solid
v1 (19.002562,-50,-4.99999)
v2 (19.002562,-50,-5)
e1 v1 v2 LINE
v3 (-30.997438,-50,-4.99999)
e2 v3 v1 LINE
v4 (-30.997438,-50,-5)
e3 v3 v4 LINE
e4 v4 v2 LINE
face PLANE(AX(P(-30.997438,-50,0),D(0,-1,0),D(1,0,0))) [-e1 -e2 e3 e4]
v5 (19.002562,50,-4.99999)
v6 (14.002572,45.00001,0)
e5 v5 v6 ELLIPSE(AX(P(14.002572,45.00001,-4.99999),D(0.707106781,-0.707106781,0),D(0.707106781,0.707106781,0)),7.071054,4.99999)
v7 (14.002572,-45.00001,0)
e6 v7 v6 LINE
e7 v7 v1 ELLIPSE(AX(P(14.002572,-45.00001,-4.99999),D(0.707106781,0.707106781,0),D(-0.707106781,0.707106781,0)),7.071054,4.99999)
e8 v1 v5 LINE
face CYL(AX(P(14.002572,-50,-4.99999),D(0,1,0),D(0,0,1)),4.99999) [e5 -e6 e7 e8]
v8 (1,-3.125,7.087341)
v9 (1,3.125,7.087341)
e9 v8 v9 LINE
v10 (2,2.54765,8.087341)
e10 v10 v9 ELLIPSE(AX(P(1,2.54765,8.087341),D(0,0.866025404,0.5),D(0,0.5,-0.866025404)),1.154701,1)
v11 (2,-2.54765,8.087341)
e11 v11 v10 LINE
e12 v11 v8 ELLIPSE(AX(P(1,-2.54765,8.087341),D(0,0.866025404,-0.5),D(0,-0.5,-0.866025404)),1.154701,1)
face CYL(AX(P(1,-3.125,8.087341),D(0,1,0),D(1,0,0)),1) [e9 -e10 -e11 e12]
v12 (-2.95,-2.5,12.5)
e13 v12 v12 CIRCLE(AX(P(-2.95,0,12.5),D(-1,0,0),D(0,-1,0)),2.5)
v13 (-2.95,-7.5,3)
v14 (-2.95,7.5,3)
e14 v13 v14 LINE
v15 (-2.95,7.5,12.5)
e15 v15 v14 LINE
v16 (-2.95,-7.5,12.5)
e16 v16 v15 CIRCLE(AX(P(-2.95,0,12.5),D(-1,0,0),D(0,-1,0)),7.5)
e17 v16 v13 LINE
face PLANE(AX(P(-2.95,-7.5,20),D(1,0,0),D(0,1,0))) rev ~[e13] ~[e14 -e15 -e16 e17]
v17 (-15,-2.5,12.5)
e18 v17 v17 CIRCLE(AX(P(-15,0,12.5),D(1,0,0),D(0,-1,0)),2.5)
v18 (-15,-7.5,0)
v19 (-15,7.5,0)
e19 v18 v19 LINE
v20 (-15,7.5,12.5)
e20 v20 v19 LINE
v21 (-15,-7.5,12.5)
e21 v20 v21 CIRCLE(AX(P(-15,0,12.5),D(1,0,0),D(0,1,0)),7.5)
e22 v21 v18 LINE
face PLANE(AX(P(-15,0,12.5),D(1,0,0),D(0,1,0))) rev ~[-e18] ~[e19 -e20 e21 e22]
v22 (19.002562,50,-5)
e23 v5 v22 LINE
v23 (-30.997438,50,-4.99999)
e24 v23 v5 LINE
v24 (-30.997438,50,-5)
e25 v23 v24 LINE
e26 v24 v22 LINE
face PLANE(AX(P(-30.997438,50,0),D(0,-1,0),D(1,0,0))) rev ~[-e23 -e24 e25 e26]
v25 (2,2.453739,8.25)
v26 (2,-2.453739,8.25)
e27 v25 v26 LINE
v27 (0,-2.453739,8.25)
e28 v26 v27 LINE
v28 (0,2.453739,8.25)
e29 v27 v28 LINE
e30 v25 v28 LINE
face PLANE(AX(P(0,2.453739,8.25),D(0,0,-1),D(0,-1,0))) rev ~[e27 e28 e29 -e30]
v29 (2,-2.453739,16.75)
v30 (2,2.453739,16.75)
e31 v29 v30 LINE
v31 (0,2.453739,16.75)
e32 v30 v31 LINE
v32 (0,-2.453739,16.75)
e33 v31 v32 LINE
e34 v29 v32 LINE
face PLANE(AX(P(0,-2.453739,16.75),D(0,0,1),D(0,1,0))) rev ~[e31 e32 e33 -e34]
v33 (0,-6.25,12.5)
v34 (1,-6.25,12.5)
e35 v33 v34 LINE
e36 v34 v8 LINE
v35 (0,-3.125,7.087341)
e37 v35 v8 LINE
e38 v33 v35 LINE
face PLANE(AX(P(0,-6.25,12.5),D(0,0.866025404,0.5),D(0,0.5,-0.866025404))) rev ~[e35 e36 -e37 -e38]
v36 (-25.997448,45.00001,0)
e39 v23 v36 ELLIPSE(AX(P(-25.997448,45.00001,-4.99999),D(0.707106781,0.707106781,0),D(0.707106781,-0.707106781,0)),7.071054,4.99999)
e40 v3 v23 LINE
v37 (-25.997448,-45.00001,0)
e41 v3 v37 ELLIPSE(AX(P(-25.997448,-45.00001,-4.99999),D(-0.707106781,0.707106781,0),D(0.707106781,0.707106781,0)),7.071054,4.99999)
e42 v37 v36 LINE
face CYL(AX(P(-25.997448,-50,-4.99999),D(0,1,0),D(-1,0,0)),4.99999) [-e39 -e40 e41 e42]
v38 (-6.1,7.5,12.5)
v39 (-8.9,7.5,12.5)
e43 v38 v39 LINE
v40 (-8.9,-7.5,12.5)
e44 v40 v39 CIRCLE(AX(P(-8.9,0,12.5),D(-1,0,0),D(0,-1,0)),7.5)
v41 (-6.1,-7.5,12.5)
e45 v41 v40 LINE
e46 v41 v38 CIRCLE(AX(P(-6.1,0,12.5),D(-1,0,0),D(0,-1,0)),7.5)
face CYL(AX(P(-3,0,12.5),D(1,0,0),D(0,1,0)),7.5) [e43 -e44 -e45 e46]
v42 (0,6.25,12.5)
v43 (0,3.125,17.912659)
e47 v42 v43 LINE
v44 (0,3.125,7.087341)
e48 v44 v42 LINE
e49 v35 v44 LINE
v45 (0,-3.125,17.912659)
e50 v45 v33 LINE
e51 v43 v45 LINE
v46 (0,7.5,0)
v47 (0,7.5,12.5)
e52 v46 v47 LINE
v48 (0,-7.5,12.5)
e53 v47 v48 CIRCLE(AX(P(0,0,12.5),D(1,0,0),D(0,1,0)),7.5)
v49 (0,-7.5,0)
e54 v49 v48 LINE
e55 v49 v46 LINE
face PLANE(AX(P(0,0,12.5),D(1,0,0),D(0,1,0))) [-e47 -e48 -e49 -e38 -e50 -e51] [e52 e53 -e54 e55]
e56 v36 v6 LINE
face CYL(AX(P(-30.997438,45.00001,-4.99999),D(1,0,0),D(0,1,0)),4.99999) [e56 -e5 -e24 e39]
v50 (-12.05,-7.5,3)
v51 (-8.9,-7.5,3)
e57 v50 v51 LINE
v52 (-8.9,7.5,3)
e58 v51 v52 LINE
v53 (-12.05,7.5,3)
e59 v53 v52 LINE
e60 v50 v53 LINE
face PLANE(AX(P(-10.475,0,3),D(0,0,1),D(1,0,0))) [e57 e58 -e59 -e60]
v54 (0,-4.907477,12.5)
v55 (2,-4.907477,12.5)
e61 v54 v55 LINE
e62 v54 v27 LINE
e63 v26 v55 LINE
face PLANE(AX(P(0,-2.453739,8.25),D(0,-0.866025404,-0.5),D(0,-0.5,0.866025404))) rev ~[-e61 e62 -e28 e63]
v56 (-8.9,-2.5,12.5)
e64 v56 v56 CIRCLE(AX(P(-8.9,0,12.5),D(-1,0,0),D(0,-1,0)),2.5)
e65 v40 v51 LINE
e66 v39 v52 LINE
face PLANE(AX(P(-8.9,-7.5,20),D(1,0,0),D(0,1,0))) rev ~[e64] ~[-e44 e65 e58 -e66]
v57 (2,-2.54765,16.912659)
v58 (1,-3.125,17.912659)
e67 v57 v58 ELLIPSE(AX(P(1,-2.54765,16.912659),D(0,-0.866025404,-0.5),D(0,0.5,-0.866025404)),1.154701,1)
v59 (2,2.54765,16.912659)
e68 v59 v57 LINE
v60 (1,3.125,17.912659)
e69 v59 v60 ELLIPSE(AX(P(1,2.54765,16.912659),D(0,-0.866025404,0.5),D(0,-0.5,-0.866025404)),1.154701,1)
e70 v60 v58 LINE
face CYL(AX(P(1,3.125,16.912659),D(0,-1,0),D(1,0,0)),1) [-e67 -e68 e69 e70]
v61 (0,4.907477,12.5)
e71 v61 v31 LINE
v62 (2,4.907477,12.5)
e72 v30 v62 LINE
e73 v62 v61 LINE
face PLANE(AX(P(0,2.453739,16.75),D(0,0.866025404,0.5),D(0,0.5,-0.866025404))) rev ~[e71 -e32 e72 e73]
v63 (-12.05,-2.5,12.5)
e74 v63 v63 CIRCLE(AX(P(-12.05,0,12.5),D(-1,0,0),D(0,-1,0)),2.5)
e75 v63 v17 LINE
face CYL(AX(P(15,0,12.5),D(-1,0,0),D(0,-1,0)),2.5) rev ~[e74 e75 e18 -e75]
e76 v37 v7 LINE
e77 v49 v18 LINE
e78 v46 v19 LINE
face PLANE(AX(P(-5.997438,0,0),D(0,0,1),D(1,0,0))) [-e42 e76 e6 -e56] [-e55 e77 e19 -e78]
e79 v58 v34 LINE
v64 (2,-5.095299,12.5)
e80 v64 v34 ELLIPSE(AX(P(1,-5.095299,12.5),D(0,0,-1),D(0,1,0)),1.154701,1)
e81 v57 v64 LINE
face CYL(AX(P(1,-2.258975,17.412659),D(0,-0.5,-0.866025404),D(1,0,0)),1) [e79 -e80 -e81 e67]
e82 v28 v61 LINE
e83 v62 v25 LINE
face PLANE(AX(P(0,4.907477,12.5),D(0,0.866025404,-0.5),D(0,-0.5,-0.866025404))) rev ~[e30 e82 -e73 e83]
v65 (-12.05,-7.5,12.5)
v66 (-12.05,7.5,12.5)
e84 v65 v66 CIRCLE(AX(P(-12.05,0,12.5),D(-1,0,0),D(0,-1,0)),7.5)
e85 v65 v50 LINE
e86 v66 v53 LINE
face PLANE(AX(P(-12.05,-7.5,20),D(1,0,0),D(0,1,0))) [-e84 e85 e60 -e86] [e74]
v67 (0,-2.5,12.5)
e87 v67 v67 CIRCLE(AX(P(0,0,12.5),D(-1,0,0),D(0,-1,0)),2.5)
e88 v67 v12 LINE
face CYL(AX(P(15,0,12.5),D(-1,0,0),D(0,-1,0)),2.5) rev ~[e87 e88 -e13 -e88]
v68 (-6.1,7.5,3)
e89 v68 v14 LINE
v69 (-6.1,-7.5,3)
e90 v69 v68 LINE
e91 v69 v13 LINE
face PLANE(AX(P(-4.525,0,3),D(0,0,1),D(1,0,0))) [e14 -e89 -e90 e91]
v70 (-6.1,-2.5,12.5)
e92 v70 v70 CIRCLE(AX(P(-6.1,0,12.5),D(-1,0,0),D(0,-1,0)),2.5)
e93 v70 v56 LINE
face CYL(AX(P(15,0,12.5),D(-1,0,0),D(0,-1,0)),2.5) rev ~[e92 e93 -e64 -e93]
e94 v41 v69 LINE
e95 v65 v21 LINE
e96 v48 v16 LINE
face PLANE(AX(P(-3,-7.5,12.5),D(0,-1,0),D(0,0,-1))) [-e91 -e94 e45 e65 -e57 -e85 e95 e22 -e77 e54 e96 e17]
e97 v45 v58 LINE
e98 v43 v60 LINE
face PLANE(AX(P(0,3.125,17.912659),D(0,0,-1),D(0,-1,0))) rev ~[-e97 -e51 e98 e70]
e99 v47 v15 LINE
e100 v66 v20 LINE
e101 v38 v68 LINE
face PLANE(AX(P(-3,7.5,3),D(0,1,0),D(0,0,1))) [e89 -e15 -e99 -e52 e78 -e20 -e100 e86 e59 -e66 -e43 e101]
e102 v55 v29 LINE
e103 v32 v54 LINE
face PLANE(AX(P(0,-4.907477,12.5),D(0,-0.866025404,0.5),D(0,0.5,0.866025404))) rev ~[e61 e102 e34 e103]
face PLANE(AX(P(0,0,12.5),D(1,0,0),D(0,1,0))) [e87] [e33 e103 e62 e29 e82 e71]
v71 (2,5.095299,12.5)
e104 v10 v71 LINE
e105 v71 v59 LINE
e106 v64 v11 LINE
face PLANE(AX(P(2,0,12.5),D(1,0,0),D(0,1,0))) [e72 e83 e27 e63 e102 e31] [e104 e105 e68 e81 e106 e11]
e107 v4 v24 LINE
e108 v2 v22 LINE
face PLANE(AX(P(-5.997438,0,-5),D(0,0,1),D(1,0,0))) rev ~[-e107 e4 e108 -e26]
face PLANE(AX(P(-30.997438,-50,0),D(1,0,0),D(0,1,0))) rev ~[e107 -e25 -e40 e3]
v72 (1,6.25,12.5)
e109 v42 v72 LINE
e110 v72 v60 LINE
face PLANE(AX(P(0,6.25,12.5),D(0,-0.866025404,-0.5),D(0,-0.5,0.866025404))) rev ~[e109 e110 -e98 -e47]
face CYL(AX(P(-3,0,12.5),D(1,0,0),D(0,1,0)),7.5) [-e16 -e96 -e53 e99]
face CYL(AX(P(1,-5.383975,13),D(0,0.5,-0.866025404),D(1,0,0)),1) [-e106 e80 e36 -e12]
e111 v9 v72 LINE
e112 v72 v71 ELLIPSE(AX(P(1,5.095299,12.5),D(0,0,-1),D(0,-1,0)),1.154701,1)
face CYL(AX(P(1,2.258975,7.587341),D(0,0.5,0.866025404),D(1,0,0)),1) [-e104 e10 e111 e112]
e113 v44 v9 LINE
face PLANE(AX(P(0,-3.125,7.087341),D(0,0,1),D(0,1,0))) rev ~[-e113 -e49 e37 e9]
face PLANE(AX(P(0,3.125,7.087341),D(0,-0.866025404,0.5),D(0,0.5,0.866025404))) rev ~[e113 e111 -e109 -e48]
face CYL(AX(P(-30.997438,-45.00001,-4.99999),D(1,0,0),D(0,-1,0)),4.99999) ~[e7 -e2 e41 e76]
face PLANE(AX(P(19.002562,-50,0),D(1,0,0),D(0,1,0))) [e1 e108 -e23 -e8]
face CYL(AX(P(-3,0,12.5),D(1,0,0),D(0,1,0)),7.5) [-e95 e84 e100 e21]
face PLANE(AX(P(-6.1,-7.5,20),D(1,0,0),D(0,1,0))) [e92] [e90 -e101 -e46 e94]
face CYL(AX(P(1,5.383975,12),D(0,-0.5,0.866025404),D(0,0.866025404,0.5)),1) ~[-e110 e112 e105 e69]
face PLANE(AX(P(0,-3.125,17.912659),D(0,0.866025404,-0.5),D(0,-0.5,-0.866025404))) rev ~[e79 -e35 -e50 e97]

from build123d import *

# Parameters (mm, degrees)
F0_W      = 15
F0_H      = 3
F1_DEPTH  = 15
F2_DEPTH  = 3
F3_DEPTH  = 3
F4_DEPTH  = 2
F5_DEPTH  = 3
F6_DEPTH  = 12
F7_D      = 5
F7_DEPTH  = 15
F7_TIP    = 1.5021515476
F9_W      = 3.15
F9_H      = 15
F10_DEPTH = 17
F11_R     = 1
F12_W     = 50
F12_H     = 100
F13_DEPTH = 5
F14_R     = 4.99999


# Not quite as in the source:
# - a fillet or chamfer is up to 0.001 mm smaller than in the source, because OpenCascade refuses the exact size


with BuildPart() as f1:
    # F0 (on Right) → F1 (new body)
    with BuildSketch(Plane.YZ):
        with Locations((0, 1.5)):
            Rectangle(F0_W, F0_H)
    extrude(amount=-F1_DEPTH)

    # F0 (on Right) → F2 (join)
    with BuildSketch(Plane.YZ):
        with BuildLine():
            Line((-7.5, 12.5), (-7.5, 3))
            Line((-7.5, 3), (7.5, 3))
            Line((7.5, 3), (7.5, 12.5))
            ThreePointArc((7.5, 12.5), (0, 20), (-7.5, 12.5))
        make_face()
        Polygon((-6.25, 12.5), (-3.125, 17.9126587737), (3.125, 17.9126587737), (6.25, 12.5), (3.125, 7.0873412263), (-3.125, 7.0873412263), align=None, mode=Mode.SUBTRACT)
    extrude(amount=-F2_DEPTH)

    # F0 (on Right) → F3 (join)
    with BuildSketch(Plane.YZ):
        Polygon((3.125, 17.9126587737), (-3.125, 17.9126587737), (-6.25, 12.5), (-3.125, 7.0873412263), (3.125, 7.0873412263), (6.25, 12.5), align=None)
        Polygon((-4.9074772881, 12.5), (-2.4537386441, 16.75), (2.4537386441, 16.75), (4.9074772881, 12.5), (2.4537386441, 8.25), (-2.4537386441, 8.25), align=None, mode=Mode.SUBTRACT)
    extrude(amount=-F3_DEPTH)

    # F0 (on Right) → F4 (join)
    with BuildSketch(Plane.YZ):
        Polygon((3.125, 17.9126587737), (-3.125, 17.9126587737), (-6.25, 12.5), (-3.125, 7.0873412263), (3.125, 7.0873412263), (6.25, 12.5), align=None)
        Polygon((-4.9074772881, 12.5), (-2.4537386441, 16.75), (2.4537386441, 16.75), (4.9074772881, 12.5), (2.4537386441, 8.25), (-2.4537386441, 8.25), align=None, mode=Mode.SUBTRACT)
    extrude(amount=F4_DEPTH)

    # F0 (on Right) → F5 (join)
    with BuildSketch(Plane.YZ):
        Polygon((2.4537386441, 16.75), (-2.4537386441, 16.75), (-4.9074772881, 12.5), (-2.4537386441, 8.25), (2.4537386441, 8.25), (4.9074772881, 12.5), align=None)
    extrude(amount=-F5_DEPTH)

    # F6 (add): a face of the model
    f6_faces = [f1.faces().sort_by_distance(p)[0] for p in [
        (-3, 0, 10.7862789639),
    ]]
    extrude(f6_faces, amount=F6_DEPTH)

    # F7
    with Locations(Plane.YZ):
        with Locations((0, 12.5)):
            Hole(F7_D / 2, depth=F7_DEPTH)
            with Locations((0, 0, -(F7_DEPTH + F7_TIP / 2))):  # 118° drill point
                Cone(0, F7_D / 2, F7_TIP, mode=Mode.SUBTRACT)

    # F9 (on offset) → F10 (cut)
    with BuildSketch(Plane.XY.offset(20)):
        with Locations((-10.475, 0)):
            Rectangle(F9_W, F9_H)
        with Locations((-4.525, 0)):
            Rectangle(F9_W, F9_H)
    extrude(amount=-F10_DEPTH, mode=Mode.SUBTRACT)

    # F11
    f11_edges = [f1.edges().sort_by_distance(p)[0] for p in [
        (2, -4.6875, 9.793671),
        (2, 0, 7.087341),
        (2, -4.6875, 15.206329),
        (2, 0, 17.912659),
        (2, 4.6875, 15.206329),
        (2, 4.6875, 9.793671),
    ]]
    fillet(f11_edges, radius=F11_R)

    # F12 (on Top) → F13 (join)
    with BuildSketch(Plane.XY):
        with Locations((-5.9974378107, 0)):
            Rectangle(F12_W, F12_H)
    extrude(amount=-F13_DEPTH)

    # F14 (radius 5 in the source; OpenCascade refuses exactly that, so slightly less here)
    f14_edges = [f1.edges().sort_by_distance(p)[0] for p in [
        (-5.997438, 50, 0),
        (19.002562, 0, 0),
        (-5.997438, -50, 0),
        (-30.997438, 0, 0),
    ]]
    fillet(f14_edges, radius=F14_R)


solid = f1.part
